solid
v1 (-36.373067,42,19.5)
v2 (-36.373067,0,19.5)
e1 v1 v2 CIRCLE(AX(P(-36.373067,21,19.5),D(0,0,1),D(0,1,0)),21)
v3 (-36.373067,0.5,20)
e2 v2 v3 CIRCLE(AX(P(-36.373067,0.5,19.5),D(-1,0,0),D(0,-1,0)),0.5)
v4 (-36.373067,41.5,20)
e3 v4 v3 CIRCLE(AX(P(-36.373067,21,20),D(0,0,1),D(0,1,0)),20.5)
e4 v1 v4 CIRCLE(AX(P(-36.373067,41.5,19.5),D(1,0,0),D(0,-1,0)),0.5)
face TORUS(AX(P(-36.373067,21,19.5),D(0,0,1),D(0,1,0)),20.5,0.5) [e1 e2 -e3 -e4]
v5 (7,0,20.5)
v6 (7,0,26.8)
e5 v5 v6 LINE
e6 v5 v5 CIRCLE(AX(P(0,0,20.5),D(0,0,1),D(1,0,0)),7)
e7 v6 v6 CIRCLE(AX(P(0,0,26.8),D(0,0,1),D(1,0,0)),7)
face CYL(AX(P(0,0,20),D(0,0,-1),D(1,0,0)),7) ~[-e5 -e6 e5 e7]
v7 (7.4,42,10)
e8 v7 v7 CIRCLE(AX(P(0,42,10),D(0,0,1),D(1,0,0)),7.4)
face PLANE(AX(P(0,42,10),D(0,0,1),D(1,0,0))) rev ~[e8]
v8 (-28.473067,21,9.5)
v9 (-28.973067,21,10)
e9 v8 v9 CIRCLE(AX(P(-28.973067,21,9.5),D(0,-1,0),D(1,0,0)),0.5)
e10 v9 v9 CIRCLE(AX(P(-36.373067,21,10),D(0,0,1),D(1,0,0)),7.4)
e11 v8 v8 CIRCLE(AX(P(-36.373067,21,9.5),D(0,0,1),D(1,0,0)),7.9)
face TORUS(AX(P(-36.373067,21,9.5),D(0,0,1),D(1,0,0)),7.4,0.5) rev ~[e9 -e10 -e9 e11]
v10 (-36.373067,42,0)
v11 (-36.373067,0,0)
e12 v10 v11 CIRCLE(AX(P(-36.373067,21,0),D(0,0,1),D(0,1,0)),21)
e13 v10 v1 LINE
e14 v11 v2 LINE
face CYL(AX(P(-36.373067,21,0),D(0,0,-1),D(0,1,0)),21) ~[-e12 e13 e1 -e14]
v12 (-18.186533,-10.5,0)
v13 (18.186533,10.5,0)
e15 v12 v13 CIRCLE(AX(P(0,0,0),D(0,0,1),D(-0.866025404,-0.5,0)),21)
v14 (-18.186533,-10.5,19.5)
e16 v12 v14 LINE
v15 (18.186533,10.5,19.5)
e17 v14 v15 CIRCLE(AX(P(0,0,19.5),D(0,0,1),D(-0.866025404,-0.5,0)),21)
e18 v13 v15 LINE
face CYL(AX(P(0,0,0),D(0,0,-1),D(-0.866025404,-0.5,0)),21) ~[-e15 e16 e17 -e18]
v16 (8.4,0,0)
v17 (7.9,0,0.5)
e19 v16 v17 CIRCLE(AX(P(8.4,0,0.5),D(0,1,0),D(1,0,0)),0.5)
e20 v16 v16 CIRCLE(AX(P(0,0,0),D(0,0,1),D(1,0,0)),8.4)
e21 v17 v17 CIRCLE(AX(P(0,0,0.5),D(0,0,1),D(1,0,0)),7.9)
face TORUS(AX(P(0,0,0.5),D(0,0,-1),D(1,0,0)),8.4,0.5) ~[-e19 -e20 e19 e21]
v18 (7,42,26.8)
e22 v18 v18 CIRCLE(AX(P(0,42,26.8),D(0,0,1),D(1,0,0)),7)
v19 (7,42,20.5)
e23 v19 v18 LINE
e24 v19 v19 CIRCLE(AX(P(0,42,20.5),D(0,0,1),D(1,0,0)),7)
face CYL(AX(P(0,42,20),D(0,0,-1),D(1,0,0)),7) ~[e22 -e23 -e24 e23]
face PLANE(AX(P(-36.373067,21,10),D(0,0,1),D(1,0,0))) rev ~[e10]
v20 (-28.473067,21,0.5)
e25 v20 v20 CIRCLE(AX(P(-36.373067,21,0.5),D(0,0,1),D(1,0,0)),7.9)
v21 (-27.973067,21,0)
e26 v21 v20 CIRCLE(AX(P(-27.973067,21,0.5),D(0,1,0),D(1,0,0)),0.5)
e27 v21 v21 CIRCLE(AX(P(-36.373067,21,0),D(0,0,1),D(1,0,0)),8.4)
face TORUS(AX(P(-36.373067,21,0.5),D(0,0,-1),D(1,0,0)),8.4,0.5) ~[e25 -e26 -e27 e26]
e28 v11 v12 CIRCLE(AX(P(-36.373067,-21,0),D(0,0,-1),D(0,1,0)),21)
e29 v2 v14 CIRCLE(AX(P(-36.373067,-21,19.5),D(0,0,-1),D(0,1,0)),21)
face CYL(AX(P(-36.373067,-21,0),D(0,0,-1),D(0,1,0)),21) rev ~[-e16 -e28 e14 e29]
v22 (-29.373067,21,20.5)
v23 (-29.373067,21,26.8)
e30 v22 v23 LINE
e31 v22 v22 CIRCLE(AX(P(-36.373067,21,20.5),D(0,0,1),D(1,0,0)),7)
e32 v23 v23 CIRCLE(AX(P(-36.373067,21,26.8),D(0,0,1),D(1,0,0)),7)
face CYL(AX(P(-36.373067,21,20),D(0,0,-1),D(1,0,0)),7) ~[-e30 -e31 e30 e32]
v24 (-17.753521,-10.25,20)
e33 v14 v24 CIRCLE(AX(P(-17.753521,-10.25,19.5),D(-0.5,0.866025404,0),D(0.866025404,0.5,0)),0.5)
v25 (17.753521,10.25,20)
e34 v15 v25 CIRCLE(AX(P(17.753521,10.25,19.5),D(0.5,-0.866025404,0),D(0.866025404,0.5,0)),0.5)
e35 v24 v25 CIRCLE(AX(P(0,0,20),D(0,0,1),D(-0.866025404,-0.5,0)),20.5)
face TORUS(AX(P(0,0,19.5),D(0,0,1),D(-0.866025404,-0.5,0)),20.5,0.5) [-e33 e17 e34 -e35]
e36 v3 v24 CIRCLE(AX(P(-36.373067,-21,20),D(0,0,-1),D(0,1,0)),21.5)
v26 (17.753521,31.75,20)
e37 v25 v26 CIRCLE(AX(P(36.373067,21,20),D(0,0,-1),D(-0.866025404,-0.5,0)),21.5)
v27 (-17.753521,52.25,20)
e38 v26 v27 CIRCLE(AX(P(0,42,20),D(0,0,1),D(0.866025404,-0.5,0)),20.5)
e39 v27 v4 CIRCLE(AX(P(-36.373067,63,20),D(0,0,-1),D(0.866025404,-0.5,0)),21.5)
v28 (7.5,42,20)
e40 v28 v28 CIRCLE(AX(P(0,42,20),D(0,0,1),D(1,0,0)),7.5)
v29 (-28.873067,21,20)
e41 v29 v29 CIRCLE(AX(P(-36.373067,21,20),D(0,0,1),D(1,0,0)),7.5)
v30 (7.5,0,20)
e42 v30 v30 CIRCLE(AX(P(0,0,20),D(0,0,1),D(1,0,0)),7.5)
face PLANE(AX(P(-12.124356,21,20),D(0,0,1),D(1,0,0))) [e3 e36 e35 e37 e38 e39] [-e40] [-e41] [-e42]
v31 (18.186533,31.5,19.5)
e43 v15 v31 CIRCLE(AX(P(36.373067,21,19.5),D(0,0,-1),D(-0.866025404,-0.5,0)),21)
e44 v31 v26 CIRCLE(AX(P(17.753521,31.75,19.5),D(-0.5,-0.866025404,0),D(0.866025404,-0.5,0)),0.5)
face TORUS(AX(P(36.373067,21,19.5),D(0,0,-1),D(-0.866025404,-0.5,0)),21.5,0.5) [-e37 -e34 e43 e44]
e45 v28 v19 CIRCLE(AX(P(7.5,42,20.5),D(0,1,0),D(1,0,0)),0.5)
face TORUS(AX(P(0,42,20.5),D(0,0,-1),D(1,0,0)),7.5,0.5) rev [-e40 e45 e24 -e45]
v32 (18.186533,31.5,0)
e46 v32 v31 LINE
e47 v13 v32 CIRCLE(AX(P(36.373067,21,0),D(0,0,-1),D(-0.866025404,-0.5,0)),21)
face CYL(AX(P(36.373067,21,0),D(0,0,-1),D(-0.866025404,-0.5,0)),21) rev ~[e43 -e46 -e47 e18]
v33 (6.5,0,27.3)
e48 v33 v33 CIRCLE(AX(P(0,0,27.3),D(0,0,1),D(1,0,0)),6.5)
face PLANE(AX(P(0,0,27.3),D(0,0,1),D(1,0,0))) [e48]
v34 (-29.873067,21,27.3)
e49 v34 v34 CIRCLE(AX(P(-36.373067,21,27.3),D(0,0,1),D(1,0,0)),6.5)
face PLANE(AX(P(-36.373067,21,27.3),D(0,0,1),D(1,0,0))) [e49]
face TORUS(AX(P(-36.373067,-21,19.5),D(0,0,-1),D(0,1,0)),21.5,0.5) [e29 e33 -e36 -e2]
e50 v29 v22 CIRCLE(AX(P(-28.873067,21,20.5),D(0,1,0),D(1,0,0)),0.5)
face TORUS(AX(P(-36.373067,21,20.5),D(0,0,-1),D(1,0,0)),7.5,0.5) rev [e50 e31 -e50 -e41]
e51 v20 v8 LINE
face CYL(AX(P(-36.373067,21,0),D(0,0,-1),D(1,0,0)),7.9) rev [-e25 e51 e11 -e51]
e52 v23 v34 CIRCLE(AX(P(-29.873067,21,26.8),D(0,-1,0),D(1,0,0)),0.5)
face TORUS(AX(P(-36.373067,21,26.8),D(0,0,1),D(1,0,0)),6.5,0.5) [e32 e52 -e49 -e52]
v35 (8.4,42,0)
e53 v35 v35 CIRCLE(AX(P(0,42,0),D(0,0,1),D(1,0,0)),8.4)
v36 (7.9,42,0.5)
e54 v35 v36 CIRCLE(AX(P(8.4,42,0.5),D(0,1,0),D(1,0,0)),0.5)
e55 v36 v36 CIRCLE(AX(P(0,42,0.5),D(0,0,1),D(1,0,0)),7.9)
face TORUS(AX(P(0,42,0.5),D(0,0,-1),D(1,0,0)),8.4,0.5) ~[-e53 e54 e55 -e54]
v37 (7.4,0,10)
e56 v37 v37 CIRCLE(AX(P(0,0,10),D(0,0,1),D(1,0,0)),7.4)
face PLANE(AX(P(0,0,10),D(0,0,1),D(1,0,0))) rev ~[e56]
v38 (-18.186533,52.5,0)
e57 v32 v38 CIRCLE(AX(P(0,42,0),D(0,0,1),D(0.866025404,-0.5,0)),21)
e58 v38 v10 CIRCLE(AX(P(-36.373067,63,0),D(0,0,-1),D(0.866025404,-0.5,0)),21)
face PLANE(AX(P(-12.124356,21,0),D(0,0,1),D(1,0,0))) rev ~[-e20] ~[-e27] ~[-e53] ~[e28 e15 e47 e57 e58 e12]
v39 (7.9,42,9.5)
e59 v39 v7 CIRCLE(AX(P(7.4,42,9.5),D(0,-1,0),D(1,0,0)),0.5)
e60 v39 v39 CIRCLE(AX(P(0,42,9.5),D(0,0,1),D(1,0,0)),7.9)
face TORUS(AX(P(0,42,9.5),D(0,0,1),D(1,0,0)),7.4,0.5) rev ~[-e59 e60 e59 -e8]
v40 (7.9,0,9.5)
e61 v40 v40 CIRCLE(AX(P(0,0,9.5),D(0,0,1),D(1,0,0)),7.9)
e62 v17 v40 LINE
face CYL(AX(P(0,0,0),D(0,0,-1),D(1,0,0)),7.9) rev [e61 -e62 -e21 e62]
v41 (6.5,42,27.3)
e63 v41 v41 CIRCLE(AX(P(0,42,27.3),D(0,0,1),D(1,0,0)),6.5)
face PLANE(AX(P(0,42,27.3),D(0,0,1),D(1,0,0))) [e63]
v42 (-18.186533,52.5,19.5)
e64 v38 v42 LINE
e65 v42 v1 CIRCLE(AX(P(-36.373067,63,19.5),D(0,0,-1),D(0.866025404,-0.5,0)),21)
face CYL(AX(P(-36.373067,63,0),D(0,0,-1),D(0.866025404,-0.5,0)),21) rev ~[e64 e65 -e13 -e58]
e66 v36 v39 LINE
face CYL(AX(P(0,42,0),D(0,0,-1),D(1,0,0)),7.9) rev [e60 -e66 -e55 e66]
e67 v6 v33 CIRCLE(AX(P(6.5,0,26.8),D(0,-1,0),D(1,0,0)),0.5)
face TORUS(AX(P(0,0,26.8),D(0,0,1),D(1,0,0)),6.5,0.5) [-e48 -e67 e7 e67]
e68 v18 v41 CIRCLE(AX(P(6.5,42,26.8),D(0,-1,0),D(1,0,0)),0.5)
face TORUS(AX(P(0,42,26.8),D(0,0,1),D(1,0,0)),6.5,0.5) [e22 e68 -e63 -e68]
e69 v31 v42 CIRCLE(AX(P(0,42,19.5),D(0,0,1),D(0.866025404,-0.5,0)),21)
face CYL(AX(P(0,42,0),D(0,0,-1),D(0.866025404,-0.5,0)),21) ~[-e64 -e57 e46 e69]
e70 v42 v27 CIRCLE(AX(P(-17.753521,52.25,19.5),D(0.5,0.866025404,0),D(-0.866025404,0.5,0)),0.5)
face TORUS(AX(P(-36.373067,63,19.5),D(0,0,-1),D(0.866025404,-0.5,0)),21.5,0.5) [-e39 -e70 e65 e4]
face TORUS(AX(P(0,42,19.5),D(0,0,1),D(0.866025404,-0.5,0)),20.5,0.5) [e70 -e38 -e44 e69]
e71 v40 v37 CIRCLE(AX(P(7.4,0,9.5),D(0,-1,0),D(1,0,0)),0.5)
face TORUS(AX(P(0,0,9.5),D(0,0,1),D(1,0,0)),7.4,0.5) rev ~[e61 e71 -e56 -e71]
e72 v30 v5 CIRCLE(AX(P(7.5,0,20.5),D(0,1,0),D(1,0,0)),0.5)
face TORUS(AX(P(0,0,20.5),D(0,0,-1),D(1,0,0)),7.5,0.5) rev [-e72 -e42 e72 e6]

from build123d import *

# Parameters (mm, degrees)
F4_R     = 7.9
F5_DEPTH = 20
F6_DEPTH = 10
F7_R     = 7
F8_DEPTH = 7.3
F9_R     = 0.5


# Not quite as in the source:
# - a feature names something its author has since deleted; it is built from what else it names


with BuildPart() as f5:
    # F4 (on Top) → F5 (new body)
    with BuildSketch(Plane.XY):
        with BuildLine():
            ThreePointArc((18.1865334795, 10.5), (15.3730669589, 21), (18.1865334795, 31.5))
            ThreePointArc((18.1865334795, 31.5), (10.5, 60.1865334795), (-18.1865334795, 52.5))
            ThreePointArc((-18.1865334795, 52.5), (-25.8730669589, 44.8134665205), (-36.3730669589, 42))
            ThreePointArc((-36.3730669589, 42), (-57.3730669589, 21), (-36.3730669589, 0))
            ThreePointArc((-36.3730669589, 0), (-25.8730669589, -2.8134665205), (-18.1865334795, -10.5))
            ThreePointArc((-18.1865334795, -10.5), (10.5, -18.1865334795), (18.1865334795, 10.5))
        make_face()
        Circle(F4_R, mode=Mode.SUBTRACT)
        with Locations((-36.3730669589, 21)):
            Circle(F4_R, mode=Mode.SUBTRACT)
        with Locations((0, 42)):
            Circle(F4_R, mode=Mode.SUBTRACT)
        with Locations((0, 42)):
            Circle(F4_R)
        Circle(F4_R)
        with Locations((-36.3730669589, 21)):
            Circle(F4_R)
    extrude(amount=F5_DEPTH)

    # F4 (on Top) → F6 (cut)
    with BuildSketch(Plane.XY):
        with Locations((0, 42)):
            Circle(F4_R)
        Circle(F4_R)
        with Locations((-36.3730669589, 21)):
            Circle(F4_R)
    extrude(amount=F6_DEPTH, mode=Mode.SUBTRACT)

    # F7 (on face) → F8 (join)
    with BuildSketch(Plane.XY.offset(20)):
        Circle(F7_R)
        with Locations((0, 42)):
            Circle(F7_R)
        with Locations((-36.3730669589, 21)):
            Circle(F7_R)
    extrude(amount=F8_DEPTH)

    # F9
    f9_edges = [f5.edges().sort_by_distance(p)[0] for p in [
        (-7, 0, 27.3),
        (-7.9, 42, 0),
        (-7.9, 42, 10),
        (-7.9, 0, 0),
        (-7.9, 0, 10),
        (-7, 42, 27.3),
        (-7, 42, 20),
        (10.5, 60.186533, 20),
        (-43.373067, 21, 20),
        (-43.373067, 21, 27.3),
        (-28.473067, 21, 5),
        (-44.273067, 21, 0),
        (-44.273067, 21, 10),
        (-7, 0, 20),
    ]]
    fillet(f9_edges, radius=F9_R)


solid = f5.part
